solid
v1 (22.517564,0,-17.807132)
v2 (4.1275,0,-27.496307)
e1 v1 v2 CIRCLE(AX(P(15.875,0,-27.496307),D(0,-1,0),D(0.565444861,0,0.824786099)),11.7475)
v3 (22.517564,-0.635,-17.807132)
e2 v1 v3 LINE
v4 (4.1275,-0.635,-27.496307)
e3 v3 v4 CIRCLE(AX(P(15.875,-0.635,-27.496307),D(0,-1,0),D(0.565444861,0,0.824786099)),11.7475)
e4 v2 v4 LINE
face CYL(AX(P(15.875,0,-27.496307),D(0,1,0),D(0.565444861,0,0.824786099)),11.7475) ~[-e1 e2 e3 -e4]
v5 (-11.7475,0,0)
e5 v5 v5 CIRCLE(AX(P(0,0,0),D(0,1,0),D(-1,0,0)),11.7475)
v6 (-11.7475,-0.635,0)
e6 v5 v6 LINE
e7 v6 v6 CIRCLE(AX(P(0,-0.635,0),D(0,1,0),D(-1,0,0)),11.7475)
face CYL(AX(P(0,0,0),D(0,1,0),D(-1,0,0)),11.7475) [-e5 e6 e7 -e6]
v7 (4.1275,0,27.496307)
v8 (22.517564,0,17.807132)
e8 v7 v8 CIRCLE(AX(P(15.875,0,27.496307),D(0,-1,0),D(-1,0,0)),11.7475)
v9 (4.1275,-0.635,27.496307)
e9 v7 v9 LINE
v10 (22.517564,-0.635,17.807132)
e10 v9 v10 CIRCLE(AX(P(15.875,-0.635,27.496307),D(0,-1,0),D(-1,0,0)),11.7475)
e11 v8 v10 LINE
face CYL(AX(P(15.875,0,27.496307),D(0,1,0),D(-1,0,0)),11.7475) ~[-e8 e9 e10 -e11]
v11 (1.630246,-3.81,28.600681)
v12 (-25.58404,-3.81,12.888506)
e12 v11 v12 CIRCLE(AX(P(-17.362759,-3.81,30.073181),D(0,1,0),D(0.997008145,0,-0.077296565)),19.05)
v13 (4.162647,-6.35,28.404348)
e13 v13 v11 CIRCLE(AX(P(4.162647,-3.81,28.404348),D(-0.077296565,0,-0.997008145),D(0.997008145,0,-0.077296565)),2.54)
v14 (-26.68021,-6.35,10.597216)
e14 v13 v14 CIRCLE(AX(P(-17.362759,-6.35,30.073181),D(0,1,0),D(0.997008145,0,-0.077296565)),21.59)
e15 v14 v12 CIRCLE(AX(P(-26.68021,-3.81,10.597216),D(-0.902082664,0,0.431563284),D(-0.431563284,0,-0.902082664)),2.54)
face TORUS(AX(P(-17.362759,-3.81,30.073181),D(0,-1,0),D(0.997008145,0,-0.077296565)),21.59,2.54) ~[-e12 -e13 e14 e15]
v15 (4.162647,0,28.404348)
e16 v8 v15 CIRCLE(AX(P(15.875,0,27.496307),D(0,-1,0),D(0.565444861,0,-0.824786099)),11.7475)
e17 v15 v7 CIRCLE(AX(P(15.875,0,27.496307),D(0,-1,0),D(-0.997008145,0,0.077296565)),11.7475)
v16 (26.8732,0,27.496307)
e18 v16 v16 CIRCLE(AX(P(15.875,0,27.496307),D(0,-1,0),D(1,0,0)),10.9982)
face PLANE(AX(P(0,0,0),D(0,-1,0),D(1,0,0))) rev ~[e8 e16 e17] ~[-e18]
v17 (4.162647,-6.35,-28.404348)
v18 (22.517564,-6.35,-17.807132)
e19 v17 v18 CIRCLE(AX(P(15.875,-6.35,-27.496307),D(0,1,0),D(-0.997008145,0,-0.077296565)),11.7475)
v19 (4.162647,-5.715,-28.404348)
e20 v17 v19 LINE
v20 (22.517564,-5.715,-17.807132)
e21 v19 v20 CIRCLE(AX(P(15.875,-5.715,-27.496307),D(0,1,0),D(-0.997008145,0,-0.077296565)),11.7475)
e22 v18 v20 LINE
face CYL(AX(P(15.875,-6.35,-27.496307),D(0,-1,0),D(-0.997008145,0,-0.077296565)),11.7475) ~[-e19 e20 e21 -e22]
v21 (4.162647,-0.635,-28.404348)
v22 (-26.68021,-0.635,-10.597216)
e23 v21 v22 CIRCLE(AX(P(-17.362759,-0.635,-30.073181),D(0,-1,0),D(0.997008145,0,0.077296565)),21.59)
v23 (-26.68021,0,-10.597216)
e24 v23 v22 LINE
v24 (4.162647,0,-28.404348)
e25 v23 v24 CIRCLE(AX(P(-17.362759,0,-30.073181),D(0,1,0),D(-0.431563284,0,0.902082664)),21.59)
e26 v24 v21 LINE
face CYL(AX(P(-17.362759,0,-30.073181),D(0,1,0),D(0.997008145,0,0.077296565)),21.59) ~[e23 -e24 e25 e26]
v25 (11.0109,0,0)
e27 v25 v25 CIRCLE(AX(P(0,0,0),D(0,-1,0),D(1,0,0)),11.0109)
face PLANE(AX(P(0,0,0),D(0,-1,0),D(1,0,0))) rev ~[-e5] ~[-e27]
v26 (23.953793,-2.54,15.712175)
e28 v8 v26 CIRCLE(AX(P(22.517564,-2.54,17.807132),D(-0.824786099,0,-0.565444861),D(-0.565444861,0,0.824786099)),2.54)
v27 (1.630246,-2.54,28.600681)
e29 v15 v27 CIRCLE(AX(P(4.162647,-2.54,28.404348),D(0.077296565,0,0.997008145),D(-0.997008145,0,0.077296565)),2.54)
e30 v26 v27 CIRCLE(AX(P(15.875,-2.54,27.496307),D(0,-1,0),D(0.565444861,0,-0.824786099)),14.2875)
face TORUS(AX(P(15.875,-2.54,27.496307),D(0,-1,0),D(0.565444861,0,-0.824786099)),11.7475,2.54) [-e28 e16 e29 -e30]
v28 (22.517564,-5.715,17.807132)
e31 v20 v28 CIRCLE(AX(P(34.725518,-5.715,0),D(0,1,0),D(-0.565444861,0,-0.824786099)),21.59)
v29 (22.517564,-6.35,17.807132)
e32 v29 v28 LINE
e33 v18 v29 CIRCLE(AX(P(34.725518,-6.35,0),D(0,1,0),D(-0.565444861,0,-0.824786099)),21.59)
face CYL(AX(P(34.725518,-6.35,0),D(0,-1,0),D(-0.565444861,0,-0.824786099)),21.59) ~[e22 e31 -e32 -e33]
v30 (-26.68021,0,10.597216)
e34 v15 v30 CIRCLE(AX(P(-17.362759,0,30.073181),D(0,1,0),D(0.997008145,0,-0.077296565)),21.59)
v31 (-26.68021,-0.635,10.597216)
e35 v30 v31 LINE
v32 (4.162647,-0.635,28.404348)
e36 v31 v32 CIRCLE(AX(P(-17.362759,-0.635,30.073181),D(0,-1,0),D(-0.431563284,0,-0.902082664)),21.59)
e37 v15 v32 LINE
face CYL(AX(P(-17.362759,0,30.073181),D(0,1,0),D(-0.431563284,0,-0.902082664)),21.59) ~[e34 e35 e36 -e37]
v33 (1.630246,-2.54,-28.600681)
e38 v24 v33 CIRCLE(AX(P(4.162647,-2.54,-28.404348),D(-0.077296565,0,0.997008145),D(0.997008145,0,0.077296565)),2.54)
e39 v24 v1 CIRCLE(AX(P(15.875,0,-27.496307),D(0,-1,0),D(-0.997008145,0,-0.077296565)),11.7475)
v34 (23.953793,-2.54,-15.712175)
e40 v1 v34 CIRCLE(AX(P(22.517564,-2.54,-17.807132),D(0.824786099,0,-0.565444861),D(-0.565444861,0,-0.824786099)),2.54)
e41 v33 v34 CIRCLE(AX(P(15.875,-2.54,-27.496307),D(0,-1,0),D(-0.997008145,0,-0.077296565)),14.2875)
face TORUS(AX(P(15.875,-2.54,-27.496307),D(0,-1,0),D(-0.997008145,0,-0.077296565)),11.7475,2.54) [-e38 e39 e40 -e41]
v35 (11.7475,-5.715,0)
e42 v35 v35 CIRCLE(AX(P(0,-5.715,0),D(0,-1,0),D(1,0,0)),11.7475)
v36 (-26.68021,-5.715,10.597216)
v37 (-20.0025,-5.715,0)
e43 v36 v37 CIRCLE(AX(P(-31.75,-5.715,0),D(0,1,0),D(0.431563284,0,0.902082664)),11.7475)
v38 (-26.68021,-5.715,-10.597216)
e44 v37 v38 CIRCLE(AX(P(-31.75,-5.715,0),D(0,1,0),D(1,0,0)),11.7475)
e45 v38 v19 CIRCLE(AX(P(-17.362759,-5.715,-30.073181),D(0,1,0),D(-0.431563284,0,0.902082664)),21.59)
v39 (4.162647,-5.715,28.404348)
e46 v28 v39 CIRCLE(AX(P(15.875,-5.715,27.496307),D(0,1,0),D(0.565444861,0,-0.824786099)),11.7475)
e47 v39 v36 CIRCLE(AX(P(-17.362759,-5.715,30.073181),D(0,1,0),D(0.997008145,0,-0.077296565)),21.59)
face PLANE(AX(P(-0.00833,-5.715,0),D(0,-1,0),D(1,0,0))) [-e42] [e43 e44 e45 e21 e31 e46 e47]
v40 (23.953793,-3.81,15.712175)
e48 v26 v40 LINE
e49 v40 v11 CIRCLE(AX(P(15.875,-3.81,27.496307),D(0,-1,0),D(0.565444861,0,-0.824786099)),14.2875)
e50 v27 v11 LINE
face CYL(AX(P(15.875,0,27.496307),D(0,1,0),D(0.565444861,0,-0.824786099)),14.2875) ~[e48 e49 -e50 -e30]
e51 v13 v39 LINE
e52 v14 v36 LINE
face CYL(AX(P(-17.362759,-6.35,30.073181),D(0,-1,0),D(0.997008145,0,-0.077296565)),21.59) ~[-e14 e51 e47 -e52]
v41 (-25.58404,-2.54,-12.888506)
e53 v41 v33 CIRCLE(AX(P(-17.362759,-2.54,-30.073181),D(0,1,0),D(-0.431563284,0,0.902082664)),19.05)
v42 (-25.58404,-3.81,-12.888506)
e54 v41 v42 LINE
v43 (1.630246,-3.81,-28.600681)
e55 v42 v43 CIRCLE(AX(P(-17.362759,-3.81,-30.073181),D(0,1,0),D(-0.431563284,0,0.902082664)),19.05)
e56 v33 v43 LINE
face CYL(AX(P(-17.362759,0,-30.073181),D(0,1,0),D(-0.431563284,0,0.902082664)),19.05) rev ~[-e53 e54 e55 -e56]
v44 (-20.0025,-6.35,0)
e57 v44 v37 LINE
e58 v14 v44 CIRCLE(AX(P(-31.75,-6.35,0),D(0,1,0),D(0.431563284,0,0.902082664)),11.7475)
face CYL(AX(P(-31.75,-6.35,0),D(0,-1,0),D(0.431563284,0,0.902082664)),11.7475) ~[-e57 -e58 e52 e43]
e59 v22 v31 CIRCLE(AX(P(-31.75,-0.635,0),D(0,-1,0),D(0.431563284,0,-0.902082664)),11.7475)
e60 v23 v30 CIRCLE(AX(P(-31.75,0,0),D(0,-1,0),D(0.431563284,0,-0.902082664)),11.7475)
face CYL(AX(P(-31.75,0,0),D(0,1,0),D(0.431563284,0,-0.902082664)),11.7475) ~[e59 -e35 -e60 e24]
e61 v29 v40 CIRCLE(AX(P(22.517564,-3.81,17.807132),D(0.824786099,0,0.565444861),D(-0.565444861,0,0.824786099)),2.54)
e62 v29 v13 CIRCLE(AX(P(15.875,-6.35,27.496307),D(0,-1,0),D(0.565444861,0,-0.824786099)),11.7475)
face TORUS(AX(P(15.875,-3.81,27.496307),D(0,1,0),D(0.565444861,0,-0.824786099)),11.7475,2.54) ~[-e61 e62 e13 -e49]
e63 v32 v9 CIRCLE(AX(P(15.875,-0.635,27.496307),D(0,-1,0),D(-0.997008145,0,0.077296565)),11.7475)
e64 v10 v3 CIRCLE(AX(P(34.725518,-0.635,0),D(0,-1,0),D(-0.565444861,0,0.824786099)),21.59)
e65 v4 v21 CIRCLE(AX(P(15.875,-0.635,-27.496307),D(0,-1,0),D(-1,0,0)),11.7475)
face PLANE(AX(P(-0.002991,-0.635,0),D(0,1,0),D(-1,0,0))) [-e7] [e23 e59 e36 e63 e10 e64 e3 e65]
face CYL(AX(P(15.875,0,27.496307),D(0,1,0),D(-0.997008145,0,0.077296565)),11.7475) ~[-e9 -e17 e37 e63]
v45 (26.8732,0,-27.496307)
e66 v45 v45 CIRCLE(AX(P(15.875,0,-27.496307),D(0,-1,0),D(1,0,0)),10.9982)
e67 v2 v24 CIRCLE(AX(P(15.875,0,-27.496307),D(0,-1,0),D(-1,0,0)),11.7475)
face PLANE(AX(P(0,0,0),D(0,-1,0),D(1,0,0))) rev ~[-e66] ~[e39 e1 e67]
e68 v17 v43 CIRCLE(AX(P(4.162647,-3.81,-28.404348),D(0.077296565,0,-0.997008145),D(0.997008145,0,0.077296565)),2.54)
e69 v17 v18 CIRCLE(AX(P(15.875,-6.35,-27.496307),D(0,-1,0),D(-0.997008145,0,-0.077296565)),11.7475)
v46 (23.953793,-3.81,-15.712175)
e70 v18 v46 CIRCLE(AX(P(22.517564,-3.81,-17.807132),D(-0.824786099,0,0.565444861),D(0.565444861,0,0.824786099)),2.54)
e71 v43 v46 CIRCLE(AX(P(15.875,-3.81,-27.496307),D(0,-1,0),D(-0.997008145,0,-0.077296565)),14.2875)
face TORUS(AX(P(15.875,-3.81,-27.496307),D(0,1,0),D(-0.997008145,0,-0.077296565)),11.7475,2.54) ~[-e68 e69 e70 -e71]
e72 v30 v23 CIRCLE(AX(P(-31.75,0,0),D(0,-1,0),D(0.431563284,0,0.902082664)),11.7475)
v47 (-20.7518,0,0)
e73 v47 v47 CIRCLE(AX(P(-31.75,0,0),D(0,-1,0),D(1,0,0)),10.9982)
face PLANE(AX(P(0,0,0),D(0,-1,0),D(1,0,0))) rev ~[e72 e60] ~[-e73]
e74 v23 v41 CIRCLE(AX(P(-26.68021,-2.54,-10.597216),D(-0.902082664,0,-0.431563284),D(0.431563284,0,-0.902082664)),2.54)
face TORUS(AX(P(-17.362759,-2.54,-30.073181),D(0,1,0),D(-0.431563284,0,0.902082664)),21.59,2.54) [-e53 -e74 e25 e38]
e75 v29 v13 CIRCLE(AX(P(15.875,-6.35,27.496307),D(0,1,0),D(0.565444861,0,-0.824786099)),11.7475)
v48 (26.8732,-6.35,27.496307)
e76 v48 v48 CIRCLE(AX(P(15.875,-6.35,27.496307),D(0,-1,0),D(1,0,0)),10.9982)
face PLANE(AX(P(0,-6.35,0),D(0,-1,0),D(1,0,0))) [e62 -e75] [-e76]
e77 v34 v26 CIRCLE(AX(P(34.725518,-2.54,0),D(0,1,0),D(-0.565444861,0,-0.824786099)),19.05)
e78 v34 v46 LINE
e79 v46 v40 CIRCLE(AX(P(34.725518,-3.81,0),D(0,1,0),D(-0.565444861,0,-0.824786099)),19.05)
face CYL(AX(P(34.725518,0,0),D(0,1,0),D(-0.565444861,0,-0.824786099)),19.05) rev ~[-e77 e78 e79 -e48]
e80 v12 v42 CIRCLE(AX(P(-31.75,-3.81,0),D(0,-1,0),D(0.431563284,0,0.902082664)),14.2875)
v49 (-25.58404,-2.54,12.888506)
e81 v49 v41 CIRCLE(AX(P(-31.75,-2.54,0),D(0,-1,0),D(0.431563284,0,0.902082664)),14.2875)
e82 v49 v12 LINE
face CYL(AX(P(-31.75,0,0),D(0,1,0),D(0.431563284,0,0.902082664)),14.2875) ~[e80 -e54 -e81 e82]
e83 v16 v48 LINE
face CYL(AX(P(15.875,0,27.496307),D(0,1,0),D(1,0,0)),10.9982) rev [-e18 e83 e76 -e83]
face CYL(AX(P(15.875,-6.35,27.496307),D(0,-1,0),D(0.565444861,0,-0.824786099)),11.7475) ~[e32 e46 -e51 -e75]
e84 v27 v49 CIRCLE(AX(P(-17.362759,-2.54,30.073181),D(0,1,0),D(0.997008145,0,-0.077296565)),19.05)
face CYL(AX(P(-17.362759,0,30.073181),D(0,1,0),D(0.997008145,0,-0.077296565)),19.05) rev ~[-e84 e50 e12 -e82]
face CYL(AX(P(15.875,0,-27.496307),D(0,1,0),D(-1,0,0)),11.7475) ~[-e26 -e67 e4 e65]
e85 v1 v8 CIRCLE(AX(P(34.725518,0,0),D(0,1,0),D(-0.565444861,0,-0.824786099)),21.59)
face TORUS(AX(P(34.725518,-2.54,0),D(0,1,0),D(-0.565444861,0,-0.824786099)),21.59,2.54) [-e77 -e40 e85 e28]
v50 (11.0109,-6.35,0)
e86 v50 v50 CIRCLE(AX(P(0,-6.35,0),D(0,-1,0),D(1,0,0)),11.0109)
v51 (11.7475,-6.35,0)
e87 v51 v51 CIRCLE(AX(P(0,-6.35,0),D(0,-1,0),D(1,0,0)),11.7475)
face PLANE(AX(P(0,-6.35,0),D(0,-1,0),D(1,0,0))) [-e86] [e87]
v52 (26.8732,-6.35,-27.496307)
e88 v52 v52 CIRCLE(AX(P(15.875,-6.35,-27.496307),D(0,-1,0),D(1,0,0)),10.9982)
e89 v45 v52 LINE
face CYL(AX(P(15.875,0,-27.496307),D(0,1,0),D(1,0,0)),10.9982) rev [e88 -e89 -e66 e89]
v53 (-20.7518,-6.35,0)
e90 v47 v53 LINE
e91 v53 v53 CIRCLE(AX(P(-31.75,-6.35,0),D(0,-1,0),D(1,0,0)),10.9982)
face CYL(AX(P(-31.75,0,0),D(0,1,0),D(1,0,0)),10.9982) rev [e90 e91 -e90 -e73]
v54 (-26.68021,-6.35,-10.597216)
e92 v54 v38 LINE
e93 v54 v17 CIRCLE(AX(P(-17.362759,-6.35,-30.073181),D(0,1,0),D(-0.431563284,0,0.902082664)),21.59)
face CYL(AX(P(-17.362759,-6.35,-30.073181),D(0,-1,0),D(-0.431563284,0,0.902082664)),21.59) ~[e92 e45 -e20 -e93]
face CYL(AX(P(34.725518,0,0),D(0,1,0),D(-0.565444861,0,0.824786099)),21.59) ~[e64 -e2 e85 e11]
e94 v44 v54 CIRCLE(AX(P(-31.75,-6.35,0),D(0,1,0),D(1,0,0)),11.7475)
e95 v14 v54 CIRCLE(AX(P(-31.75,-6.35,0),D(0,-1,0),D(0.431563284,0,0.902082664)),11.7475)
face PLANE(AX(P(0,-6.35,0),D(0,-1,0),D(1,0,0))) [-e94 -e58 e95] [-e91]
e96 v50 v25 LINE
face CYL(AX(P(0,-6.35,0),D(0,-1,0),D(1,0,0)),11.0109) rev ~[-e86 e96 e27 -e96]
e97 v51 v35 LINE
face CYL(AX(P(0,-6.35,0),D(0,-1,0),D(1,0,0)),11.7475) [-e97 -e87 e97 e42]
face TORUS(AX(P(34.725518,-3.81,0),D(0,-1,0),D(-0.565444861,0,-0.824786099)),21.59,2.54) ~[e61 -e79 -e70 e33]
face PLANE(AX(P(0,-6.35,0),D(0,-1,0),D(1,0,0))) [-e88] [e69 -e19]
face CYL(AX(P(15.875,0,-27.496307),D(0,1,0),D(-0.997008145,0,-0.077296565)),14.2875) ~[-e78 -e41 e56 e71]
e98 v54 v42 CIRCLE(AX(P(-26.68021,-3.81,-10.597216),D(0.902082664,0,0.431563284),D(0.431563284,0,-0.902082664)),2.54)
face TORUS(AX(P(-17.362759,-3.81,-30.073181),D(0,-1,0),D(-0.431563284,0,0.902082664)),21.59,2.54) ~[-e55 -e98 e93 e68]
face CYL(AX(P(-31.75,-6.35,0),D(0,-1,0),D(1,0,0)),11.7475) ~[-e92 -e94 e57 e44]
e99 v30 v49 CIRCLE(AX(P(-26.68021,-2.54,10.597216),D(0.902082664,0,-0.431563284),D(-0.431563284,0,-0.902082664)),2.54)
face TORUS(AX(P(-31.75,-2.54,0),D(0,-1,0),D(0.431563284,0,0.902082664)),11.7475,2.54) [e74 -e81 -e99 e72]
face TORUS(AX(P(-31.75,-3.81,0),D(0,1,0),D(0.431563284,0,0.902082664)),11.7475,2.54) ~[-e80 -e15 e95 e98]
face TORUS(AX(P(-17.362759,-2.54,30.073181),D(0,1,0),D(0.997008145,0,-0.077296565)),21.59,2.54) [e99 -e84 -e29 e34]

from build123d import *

# Parameters (mm, degrees)
F0_R     = 10.9982
F0_R_2   = 14.2875
F1_DEPTH = 6.35
F2_R     = 14.2875
F2_R_2   = 11.0109
F3_DEPTH = 6.35
F4_R     = 2.54
F5_R     = 11.7475
F6_DEPTH = 0.635
F7_R     = 11.7475
F8_DEPTH = 0.635


# Not quite as in the source:
# - a feature names something its author has since deleted; it is built from what else it names


with BuildPart() as f1:
    # F0 (on Front) → F1 (new body)
    with BuildSketch(Plane.XZ):
        with BuildLine():
            ThreePointArc((23.9537934556, -15.7121751829), (15.6755180632, 0), (23.9537934556, 15.7121751829))
            ThreePointArc((23.9537934556, 15.7121751829), (23.01875, 39.8696445267), (1.6302461293, 28.6006812411))
            ThreePointArc((1.6302461293, 28.6006812411), (-7.8377590316, 13.5753968602), (-25.584039585, 12.8885060581))
            ThreePointArc((-25.584039585, 12.8885060581), (-46.0375, 0), (-25.584039585, -12.8885060581))
            ThreePointArc((-25.584039585, -12.8885060581), (-7.8377590316, -13.5753968602), (1.6302461293, -28.6006812411))
            ThreePointArc((1.6302461293, -28.6006812411), (23.01875, -39.8696445267), (23.9537934556, -15.7121751829))
        make_face()
        with Locations((15.875, -27.4963065702)):
            Circle(F0_R, mode=Mode.SUBTRACT)
        with Locations((-31.75, 0)):
            Circle(F0_R, mode=Mode.SUBTRACT)
        Circle(F0_R_2, mode=Mode.SUBTRACT)
        with Locations((15.875, 27.4963065702)):
            Circle(F0_R, mode=Mode.SUBTRACT)
    extrude(amount=F1_DEPTH)

    # F2 (on face) → F3 (join)
    with BuildSketch(Plane.XZ.offset(6.35)):
        Circle(F2_R)
        Circle(F2_R_2, mode=Mode.SUBTRACT)
    extrude(amount=-F3_DEPTH)

    # F4
    f4_edges = [f1.edges().sort_by_distance(p)[0] for p in [
        (-7.837759, -6.35, 13.575397),
        (15.675518, 0, 0),
    ]]
    fillet(f4_edges, radius=F4_R)

    # F5 (on face) → F6 (cut)
    with BuildSketch(Plane.XZ.offset(6.35)):
        with BuildLine():
            ThreePointArc((-20.0025, 0), (-21.8111592615, -6.2628428867), (-26.6802103254, -10.5972160922))
            ThreePointArc((-26.6802103254, -10.5972160922), (-6.5677590316, -11.3756923346), (4.1626468174, -28.4043479662))
            ThreePointArc((4.1626468174, -28.4043479662), (10.00125, -17.3226731392), (22.517563508, -17.807131874))
            ThreePointArc((22.517563508, -17.807131874), (13.1355180632, 0), (22.517563508, 17.807131874))
            ThreePointArc((22.517563508, 17.807131874), (10.00125, 17.3226731392), (4.1626468174, 28.4043479662))
            ThreePointArc((4.1626468174, 28.4043479662), (-6.5677590316, 11.3756923346), (-26.6802103254, 10.5972160922))
            ThreePointArc((-26.6802103254, 10.5972160922), (-21.8111592615, 6.2628428867), (-20.0025, 0))
        make_face()
        Circle(F5_R, mode=Mode.SUBTRACT)
    extrude(amount=-F6_DEPTH, mode=Mode.SUBTRACT)

    # F7 (on face) → F8 (cut)
    with BuildSketch(Plane(origin=(0, 0, 0), x_dir=(-1, 0, 0), z_dir=(0, 1, 0))):
        with BuildLine():
            ThreePointArc((-4.1275, -27.4963065702), (-4.1362899929, -27.9506672407), (-4.1626468174, -28.4043479662))
            ThreePointArc((-4.1626468174, -28.4043479662), (6.5677590316, -11.3756923346), (26.6802103254, -10.5972160922))
            ThreePointArc((26.6802103254, -10.5972160922), (20.0025, 0), (26.6802103254, 10.5972160922))
            ThreePointArc((26.6802103254, 10.5972160922), (6.5677590316, 11.3756923346), (-4.1626468174, 28.4043479662))
            ThreePointArc((-4.1626468174, 28.4043479662), (-4.1362899929, 27.9506672407), (-4.1275, 27.4963065702))
            ThreePointArc((-4.1275, 27.4963065702), (-10.3991328796, 17.1031051611), (-22.517563508, 17.807131874))
            ThreePointArc((-22.517563508, 17.807131874), (-13.1355180632, 0), (-22.517563508, -17.807131874))
            ThreePointArc((-22.517563508, -17.807131874), (-10.3991328796, -17.1031051611), (-4.1275, -27.4963065702))
        make_face()
        Circle(F7_R, mode=Mode.SUBTRACT)
    extrude(amount=-F8_DEPTH, mode=Mode.SUBTRACT)


solid = f1.part
